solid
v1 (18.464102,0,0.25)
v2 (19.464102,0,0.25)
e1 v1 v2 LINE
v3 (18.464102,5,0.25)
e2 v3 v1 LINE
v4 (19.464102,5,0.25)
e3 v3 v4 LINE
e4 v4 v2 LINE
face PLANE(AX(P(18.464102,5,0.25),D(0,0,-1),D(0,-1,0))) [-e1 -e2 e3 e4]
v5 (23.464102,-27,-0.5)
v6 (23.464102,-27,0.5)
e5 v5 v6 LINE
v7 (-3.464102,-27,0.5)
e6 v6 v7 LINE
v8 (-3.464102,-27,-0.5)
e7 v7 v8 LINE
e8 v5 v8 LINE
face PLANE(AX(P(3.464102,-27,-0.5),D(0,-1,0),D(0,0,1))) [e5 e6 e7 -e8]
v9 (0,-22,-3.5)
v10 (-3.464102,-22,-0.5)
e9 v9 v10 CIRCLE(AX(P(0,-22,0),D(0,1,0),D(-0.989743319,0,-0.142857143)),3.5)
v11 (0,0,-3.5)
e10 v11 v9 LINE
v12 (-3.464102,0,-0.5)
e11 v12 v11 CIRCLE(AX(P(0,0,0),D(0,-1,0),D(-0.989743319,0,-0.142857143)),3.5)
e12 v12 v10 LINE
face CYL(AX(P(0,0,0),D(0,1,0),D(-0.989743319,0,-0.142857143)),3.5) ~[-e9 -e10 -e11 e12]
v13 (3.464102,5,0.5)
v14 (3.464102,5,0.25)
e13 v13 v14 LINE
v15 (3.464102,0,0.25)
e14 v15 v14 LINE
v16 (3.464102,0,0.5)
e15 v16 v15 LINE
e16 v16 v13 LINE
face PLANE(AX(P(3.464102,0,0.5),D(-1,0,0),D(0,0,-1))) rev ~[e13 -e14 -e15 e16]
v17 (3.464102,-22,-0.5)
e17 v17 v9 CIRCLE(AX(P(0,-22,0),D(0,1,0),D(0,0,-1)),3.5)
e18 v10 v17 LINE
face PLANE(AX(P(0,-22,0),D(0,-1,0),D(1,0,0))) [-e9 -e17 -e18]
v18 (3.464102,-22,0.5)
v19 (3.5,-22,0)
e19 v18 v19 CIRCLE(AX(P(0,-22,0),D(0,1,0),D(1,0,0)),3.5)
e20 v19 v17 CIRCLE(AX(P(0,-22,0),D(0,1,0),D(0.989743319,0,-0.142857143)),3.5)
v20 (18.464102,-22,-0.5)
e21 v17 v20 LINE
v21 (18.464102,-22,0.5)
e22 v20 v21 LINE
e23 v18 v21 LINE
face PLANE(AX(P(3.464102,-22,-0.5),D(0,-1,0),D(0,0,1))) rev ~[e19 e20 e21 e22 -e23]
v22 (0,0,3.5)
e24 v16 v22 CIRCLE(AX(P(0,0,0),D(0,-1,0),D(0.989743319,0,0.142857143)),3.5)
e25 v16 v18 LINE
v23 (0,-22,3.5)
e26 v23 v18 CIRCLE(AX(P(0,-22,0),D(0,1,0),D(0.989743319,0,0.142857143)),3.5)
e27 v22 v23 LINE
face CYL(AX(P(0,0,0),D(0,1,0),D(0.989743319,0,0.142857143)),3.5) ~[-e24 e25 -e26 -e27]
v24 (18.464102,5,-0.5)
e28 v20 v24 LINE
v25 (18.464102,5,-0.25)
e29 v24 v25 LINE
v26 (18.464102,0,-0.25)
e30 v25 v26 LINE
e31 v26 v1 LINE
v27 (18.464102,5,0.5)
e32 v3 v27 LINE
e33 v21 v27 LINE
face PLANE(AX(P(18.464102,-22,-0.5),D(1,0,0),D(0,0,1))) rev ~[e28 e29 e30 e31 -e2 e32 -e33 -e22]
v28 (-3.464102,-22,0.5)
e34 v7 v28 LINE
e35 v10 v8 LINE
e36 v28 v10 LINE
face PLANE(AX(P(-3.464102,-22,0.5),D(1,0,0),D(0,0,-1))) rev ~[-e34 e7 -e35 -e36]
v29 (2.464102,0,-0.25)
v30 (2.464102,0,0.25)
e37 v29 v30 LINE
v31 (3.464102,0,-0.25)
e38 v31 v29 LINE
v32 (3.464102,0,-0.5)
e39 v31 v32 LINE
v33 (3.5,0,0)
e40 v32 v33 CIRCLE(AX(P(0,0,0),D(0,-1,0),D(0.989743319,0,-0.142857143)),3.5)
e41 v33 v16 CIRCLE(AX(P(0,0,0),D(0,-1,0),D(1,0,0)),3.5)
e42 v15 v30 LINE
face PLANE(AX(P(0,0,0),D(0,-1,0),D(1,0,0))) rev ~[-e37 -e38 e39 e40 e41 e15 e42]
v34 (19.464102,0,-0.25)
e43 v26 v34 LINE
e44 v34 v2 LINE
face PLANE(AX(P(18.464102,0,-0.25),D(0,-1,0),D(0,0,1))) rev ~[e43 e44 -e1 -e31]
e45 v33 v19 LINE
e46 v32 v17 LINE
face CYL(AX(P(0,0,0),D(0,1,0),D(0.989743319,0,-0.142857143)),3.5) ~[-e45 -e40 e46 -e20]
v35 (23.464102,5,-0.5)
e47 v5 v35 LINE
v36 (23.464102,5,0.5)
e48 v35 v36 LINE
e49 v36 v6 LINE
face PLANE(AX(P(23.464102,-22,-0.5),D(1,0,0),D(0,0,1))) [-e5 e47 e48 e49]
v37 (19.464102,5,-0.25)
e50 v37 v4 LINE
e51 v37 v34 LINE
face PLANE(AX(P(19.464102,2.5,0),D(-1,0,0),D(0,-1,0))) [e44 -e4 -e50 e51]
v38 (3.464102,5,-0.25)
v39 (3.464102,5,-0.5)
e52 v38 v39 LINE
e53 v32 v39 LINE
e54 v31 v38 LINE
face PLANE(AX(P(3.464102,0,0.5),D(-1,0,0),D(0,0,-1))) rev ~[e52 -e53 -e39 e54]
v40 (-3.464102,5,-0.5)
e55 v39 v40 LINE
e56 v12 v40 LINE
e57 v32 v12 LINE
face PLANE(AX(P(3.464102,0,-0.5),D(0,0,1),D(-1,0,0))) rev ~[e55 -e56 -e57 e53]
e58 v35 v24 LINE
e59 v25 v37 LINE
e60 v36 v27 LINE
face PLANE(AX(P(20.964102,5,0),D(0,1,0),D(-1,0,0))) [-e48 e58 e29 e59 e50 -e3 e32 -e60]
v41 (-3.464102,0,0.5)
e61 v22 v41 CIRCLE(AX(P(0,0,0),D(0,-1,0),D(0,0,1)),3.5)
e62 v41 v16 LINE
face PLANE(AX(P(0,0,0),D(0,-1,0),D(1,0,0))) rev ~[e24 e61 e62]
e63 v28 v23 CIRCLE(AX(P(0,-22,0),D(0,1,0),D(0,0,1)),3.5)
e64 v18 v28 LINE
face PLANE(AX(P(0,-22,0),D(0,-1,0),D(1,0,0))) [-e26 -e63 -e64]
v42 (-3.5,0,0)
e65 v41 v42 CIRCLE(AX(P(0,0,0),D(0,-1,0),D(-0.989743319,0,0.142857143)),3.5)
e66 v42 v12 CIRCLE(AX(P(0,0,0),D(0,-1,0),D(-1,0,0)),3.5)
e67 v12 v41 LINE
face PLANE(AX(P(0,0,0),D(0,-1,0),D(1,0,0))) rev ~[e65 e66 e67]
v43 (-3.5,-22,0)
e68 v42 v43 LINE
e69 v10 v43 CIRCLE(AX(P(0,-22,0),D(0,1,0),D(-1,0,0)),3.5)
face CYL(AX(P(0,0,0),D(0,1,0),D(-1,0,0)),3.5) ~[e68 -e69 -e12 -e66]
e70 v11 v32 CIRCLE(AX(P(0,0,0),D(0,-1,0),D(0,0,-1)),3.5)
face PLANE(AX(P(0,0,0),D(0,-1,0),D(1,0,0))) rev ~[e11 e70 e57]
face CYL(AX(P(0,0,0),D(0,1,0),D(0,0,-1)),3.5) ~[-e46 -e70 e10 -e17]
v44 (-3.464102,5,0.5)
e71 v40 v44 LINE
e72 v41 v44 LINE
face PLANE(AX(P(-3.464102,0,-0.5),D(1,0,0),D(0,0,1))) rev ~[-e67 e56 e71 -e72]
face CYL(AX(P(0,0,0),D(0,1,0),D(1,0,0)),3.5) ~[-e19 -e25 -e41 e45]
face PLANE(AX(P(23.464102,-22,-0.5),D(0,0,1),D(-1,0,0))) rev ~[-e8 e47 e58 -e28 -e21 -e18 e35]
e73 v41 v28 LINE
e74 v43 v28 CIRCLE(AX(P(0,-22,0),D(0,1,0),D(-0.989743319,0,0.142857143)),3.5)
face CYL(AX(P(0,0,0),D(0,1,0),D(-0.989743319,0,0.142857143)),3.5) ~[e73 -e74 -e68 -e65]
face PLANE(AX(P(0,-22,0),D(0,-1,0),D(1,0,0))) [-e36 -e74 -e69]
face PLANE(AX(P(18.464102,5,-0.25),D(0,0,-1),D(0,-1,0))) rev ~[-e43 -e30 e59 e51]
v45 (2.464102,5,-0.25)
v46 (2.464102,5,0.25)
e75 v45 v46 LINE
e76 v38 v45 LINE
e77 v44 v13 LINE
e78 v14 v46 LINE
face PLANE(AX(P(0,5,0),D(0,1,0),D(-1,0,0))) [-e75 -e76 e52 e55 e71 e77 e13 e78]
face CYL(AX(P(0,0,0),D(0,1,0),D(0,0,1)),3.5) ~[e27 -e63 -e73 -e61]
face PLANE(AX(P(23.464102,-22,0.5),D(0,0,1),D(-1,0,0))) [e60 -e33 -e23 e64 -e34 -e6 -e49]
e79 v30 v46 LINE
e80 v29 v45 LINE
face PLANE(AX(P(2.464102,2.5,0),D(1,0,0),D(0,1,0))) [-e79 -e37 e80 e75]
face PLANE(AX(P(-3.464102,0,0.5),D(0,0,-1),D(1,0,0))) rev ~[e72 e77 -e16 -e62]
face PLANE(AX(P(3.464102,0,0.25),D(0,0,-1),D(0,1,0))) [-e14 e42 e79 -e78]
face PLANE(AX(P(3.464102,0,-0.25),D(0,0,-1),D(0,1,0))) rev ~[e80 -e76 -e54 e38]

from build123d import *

# Parameters (mm, degrees)
F1_DEPTH  = 22
F3_DEPTH  = 5
F5_DEPTH  = 5
F7_DEPTH  = 25
F8_DEPTH  = 20
F9_W      = 5
F9_H      = 1
F10_DEPTH = 27
F11_W     = 5
F11_H     = 0.5
F12_DEPTH = 1
F13_W     = 5
F13_H     = 0.5
F14_DEPTH = 1


with BuildPart() as f1:
    # F0 (on Front) → F1 (new body)
    with BuildSketch(Plane.XZ):
        with BuildLine():
            ThreePointArc((0, -3.5), (2.4748737342, -2.4748737342), (3.5, 0))
            ThreePointArc((3.5, 0), (2.4748737342, 2.4748737342), (0, 3.5))
            ThreePointArc((0, 3.5), (-2.4748737342, 2.4748737342), (-3.5, 0))
            ThreePointArc((-3.5, 0), (-2.4748737342, -2.4748737342), (0, -3.5))
        make_face()
        with BuildLine():
            ThreePointArc((-3.5, 0), (-2.4748737342, 2.4748737342), (0, 3.5))
            Line((0, 3.5), (-3.5, 3.5))
            Line((-3.5, 3.5), (-3.5, 0))
        make_face()
        with BuildLine():
            Line((-3.5, -3.5), (0, -3.5))
            ThreePointArc((0, -3.5), (-2.4748737342, -2.4748737342), (-3.5, 0))
            Line((-3.5, 0), (-3.5, -3.5))
        make_face()
        with BuildLine():
            Line((3.5, -3.5), (3.5, 0))
            ThreePointArc((3.5, 0), (2.4748737342, -2.4748737342), (0, -3.5))
            Line((0, -3.5), (3.5, -3.5))
        make_face()
        with BuildLine():
            ThreePointArc((0, 3.5), (2.4748737342, 2.4748737342), (3.5, 0))
            Line((3.5, 0), (3.5, 3.5))
            Line((3.5, 3.5), (0, 3.5))
        make_face()
    extrude(amount=F1_DEPTH)

    # F2 (on face) → F3 (join)
    with BuildSketch(Plane.XZ.offset(22)):
        Polygon((3.4641016151, -0.5), (3.4641016151, 0.5), (0, 0.5), (-3.4641016151, 0.5), (-3.4641016151, -0.5), align=None)
    extrude(amount=F3_DEPTH)

    # F4 (on face) → F5 (join)
    with BuildSketch(Plane(origin=(0, 0, 0), x_dir=(-1, 0, 0), z_dir=(0, 1, 0))):
        Polygon((3.4641016151, -0.5), (3.4641016151, 0.5), (0, 0.5), (-3.4641016151, 0.5), (-3.4641016151, -0.5), (0, -0.5), align=None)
    extrude(amount=F5_DEPTH)

    # F6 (on face) → F7 (cut)
    with BuildSketch(Plane(origin=(0, 0, 0), x_dir=(-1, 0, 0), z_dir=(0, 1, 0))):
        with BuildLine():
            ThreePointArc((-3.4641016151, 0.5), (-2.2912878475, 2.6457513111), (0, 3.5))
            Line((0, 3.5), (-3.5, 3.5))
            Line((-3.5, 3.5), (-3.5, 0))
            ThreePointArc((-3.5, 0), (-3.491013868, 0.2506435188), (-3.4641016151, 0.5))
        make_face()
        with BuildLine():
            ThreePointArc((3.4641016151, 0.5), (3.491013868, 0.2506435188), (3.5, 0))
            Line((3.5, 0), (3.5, 3.5))
            Line((3.5, 3.5), (0, 3.5))
            ThreePointArc((0, 3.5), (2.2912878475, 2.6457513111), (3.4641016151, 0.5))
        make_face()
        with BuildLine():
            Line((-3.5, -3.5), (0, -3.5))
            ThreePointArc((0, -3.5), (-2.2912878475, -2.6457513111), (-3.4641016151, -0.5))
            ThreePointArc((-3.4641016151, -0.5), (-3.491013868, -0.2506435188), (-3.5, 0))
            Line((-3.5, 0), (-3.5, -3.5))
        make_face()
        with BuildLine():
            Line((3.5, -3.5), (3.5, 0))
            ThreePointArc((3.5, 0), (3.491013868, -0.2506435188), (3.4641016151, -0.5))
            ThreePointArc((3.4641016151, -0.5), (2.2912878475, -2.6457513111), (0, -3.5))
            Line((0, -3.5), (3.5, -3.5))
        make_face()
    extrude(amount=-F7_DEPTH, mode=Mode.SUBTRACT)

    # F8 (add): a face of the model
    f8_faces = [f1.faces().sort_by_distance(p)[0] for p in [
        (3.4641016151, -24.5, 0),
    ]]
    extrude(f8_faces, amount=F8_DEPTH)

    # F9 (on face) → F10 (join)
    with BuildSketch(Plane(origin=(0, -22, 0), x_dir=(-1, 0, 0), z_dir=(0, 1, 0))):
        with Locations((-20.9641016151, 0)):
            Rectangle(F9_W, F9_H)
    extrude(amount=F10_DEPTH)

    # F11 (on face) → F12 (cut)
    with BuildSketch(Plane(origin=(18.4641016151, 0, 0), x_dir=(0, -1, 0), z_dir=(-1, 0, 0))):
        with Locations((-2.5, 0)):
            Rectangle(F11_W, F11_H)
    extrude(amount=-F12_DEPTH, mode=Mode.SUBTRACT)

    # F13 (on face) → F14 (cut)
    with BuildSketch(Plane.YZ.offset(3.4641016151)):
        with Locations((2.5, 0)):
            Rectangle(F13_W, F13_H)
    extrude(amount=-F14_DEPTH, mode=Mode.SUBTRACT)


solid = f1.part
